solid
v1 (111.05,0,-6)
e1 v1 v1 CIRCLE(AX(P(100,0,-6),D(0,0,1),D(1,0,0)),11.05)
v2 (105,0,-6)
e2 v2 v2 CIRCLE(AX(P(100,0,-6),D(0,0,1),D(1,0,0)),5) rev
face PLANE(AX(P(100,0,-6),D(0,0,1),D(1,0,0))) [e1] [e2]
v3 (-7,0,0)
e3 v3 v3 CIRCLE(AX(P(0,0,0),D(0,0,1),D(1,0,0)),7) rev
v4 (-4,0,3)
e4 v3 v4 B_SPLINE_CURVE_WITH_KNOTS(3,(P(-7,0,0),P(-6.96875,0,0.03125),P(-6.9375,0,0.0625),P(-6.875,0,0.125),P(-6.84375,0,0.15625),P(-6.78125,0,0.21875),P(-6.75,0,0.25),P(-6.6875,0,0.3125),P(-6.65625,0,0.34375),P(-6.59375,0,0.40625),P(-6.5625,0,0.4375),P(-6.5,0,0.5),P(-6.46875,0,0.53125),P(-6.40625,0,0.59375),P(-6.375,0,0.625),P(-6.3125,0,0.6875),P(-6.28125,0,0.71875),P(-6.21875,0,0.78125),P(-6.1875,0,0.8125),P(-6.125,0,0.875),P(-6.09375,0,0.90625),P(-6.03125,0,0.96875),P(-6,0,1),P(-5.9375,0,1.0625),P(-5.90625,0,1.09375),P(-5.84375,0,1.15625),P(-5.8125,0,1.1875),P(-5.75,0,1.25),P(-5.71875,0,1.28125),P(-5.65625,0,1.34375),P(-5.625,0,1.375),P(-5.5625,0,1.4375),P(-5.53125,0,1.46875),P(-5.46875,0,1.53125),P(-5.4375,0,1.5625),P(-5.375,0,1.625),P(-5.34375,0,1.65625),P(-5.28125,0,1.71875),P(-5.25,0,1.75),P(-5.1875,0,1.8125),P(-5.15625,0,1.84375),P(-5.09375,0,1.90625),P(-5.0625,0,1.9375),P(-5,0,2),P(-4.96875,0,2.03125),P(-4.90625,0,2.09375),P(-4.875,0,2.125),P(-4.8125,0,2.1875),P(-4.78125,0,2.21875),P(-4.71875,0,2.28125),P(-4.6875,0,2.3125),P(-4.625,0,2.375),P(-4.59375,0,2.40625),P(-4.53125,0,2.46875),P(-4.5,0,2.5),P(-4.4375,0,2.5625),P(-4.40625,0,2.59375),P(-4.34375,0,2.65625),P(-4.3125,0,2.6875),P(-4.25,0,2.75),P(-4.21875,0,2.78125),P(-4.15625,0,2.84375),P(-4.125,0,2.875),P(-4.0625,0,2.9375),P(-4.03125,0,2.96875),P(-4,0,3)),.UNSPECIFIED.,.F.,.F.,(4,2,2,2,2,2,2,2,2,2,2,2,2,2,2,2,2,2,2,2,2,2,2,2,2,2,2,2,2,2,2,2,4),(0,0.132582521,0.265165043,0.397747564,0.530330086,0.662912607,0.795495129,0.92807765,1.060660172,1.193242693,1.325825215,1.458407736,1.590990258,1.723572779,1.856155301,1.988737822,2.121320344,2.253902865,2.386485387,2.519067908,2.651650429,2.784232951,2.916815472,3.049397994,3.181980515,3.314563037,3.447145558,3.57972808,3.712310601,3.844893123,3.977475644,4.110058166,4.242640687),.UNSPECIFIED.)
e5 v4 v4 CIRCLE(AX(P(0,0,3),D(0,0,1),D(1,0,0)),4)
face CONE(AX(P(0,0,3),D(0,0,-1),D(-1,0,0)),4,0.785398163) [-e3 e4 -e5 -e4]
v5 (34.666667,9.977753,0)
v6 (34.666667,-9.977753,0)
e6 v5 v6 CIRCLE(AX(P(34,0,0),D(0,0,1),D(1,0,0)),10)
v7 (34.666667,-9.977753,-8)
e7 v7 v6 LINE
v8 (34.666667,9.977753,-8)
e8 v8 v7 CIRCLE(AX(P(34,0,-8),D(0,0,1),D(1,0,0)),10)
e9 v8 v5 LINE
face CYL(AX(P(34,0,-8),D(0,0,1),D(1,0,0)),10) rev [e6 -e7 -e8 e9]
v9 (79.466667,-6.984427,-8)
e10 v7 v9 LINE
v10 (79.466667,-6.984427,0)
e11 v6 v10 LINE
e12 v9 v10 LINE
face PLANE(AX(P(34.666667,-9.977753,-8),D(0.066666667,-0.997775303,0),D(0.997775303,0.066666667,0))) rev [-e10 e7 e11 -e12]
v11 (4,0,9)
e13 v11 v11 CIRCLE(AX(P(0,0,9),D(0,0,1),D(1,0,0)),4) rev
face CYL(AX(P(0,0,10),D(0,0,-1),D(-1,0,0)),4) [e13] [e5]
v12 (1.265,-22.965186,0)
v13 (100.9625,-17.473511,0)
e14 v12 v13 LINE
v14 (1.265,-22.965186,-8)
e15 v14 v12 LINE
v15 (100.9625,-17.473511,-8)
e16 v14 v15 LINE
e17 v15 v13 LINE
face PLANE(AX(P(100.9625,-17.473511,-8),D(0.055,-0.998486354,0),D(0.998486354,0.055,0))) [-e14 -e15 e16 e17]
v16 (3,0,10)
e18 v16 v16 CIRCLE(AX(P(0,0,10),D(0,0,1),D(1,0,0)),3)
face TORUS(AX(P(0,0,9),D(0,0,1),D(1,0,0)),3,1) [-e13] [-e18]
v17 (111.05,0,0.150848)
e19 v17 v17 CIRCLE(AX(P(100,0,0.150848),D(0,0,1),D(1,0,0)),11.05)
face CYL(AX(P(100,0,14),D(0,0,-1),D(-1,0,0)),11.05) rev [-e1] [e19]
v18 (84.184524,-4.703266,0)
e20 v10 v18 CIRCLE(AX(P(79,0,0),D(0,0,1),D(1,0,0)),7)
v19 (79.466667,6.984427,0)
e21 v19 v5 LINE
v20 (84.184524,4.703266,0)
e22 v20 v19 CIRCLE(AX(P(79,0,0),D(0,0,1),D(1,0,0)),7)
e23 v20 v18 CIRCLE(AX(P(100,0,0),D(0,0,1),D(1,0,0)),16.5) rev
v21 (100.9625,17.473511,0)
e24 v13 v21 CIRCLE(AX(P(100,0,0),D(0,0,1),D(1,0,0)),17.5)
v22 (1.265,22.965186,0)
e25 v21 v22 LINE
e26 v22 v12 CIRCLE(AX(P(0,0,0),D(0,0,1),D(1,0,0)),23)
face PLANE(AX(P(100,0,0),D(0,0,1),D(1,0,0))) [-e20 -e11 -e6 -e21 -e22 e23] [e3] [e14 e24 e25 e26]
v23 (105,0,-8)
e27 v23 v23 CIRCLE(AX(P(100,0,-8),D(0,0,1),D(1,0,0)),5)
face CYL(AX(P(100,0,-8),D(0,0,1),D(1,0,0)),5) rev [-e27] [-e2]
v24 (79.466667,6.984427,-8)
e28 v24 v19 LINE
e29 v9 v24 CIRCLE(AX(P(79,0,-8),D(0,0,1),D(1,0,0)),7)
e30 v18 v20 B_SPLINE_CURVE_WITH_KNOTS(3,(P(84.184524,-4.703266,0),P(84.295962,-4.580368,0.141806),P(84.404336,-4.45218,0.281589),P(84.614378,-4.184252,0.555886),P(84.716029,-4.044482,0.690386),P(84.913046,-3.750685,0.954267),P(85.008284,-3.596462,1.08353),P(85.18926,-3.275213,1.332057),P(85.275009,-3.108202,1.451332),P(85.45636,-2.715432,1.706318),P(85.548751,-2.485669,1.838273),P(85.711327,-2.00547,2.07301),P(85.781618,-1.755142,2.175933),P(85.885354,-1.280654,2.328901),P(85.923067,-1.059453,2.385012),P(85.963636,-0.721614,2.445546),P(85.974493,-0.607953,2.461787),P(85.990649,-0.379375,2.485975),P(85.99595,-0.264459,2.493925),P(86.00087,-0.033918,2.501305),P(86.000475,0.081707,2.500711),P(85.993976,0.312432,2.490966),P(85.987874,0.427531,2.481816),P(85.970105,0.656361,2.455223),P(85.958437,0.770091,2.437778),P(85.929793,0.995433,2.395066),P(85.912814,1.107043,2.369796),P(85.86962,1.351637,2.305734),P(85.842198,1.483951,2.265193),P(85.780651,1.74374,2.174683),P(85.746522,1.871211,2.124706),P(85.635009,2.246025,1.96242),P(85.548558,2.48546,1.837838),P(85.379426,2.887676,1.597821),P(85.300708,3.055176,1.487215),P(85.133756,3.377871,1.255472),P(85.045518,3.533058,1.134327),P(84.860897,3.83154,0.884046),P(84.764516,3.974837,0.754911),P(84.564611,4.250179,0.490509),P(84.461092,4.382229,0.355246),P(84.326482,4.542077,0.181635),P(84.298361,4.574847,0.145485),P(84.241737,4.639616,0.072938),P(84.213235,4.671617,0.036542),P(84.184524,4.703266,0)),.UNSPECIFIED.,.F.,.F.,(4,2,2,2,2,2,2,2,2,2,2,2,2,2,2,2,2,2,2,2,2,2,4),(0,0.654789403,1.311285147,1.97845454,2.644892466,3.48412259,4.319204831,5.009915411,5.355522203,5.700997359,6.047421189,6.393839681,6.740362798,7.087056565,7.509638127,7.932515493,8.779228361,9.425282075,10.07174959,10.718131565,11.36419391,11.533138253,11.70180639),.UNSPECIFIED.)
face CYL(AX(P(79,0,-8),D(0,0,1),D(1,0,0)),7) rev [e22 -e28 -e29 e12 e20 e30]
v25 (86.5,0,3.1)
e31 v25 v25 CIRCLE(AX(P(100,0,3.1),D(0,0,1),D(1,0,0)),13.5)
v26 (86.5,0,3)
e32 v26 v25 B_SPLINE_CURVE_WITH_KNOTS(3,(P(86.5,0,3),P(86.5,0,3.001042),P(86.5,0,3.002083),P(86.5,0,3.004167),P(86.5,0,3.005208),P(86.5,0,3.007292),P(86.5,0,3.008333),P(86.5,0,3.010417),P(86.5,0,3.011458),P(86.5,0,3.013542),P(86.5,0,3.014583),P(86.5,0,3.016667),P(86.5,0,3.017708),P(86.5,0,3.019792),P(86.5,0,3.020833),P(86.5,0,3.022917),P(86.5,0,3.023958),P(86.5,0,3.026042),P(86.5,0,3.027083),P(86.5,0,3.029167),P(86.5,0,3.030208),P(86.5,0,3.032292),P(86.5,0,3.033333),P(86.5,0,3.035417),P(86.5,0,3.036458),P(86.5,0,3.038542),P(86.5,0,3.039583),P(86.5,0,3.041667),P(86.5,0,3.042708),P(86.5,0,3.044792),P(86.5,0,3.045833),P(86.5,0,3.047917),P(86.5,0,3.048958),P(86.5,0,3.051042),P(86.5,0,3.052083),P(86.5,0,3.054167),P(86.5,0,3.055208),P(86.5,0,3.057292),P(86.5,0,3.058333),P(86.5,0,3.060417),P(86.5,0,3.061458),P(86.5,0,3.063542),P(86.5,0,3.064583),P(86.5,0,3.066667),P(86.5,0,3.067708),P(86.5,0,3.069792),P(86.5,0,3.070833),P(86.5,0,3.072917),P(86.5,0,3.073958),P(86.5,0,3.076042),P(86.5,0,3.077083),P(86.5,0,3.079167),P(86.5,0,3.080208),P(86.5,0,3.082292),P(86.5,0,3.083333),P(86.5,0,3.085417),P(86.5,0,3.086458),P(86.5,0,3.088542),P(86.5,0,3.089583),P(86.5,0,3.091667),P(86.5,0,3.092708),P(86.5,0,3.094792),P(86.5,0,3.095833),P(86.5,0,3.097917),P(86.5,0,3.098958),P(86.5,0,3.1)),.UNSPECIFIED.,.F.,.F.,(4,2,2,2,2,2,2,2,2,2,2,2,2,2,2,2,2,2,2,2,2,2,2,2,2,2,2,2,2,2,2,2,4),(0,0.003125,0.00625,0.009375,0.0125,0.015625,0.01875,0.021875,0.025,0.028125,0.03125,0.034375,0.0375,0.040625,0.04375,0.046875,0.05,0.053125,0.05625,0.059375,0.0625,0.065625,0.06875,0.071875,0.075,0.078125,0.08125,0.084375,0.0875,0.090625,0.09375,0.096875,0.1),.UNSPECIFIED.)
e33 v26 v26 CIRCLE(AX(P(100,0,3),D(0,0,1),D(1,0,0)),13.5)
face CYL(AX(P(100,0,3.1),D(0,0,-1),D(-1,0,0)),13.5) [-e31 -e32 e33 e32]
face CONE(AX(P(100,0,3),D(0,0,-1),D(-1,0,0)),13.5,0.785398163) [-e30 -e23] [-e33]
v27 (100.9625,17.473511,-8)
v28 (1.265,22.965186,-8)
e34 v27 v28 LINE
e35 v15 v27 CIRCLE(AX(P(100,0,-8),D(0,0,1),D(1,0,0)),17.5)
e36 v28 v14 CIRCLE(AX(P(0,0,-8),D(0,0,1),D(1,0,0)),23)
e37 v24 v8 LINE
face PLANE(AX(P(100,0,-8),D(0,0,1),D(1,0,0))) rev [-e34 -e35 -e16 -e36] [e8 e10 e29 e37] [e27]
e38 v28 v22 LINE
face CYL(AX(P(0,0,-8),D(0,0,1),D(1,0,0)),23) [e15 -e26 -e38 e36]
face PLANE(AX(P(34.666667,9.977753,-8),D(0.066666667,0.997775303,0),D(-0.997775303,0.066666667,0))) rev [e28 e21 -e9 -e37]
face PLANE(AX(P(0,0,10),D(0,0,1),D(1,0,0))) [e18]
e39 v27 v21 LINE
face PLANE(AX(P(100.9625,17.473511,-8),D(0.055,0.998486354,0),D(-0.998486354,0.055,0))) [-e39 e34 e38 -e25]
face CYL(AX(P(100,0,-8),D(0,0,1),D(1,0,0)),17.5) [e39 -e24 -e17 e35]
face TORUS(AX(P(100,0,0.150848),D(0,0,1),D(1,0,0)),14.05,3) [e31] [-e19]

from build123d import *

# Parameters (mm, degrees)
SKETCH5_R           = 4
BOSS_EXTRUDE1_DEPTH = 10
SKETCH13_R          = 5.0000000000000036
BOSS_EXTRUDE5_DEPTH = 8
CHAMFER1_SIZE       = 3
FILLET1_R           = 1
SKETCH14_R          = 13.499999999999998
BOSS_EXTRUDE6_DEPTH = 3.1
CUT_EXTRUDE1_START  = -6
SKETCH15_R          = 11.050000000000002
CUT_EXTRUDE1_DEPTH  = 20
FILLET2_R           = 3
CHAMFER2_SIZE       = 3


with BuildPart() as part:
    # Sketch5 → Boss-Extrude1 (new body)
    with BuildSketch(Plane(origin=(0, 0, 0), x_dir=(0, 1, 0), z_dir=(0, 0, 1))):
        with Locations(Location((0, 0, 0), (0, 0, 270))):
            Circle(SKETCH5_R)
    extrude(amount=BOSS_EXTRUDE1_DEPTH)

    # Sketch13 → Boss-Extrude5 (add)
    with BuildSketch(Plane(origin=(0, 0, 0), x_dir=(0, 1, 0), z_dir=(0, 0, 1))):
        with BuildLine():
            Line((-17.473511202674743, -100.9625), (-22.96518615208682, -1.2650000000000037))
            ThreePointArc((-22.96518615208682, -1.2650000000000037), (1.41e-15, 23.000000000000004), (22.96518615208682, -1.2649999999999981))
            Line((22.96518615208682, -1.2649999999999981), (17.47351120267477, -100.9625))
            ThreePointArc((17.47351120267477, -100.9625), (1.332e-14, -117.5), (-17.473511202674743, -100.9625))
        make_face()
        with Locations(Location((1.225e-14, -100, 0), (0, 0, 270))):
            Circle(SKETCH13_R, mode=Mode.SUBTRACT)
        with BuildLine():
            Line((-9.977753031397176, -34.66666666666667), (-6.984427121978019, -79.46666666666665))
            ThreePointArc((-6.984427121978019, -79.46666666666665), (8.55e-15, -86), (6.9844271219780385, -79.46666666666665))
            Line((6.9844271219780385, -79.46666666666665), (9.977753031397182, -34.66666666666667))
            ThreePointArc((9.977753031397182, -34.66666666666667), (4.78e-15, -24), (-9.977753031397176, -34.66666666666667))
        make_face(mode=Mode.SUBTRACT)
    extrude(amount=-BOSS_EXTRUDE5_DEPTH)

    # Chamfer1
    chamfer1_edges = [part.edges().sort_by_distance(p)[0] for p in [
        (-4, 1.22e-15, 0),
    ]]
    chamfer(chamfer1_edges, length=CHAMFER1_SIZE)

    # Fillet1
    fillet1_edges = [part.edges().sort_by_distance(p)[0] for p in [
        (-4, 1.22e-15, 10),
    ]]
    fillet(fillet1_edges, radius=FILLET1_R)

    # Sketch14 → Boss-Extrude6 (add)
    with BuildSketch(Plane(origin=(0, 0, 0), x_dir=(0, 1, 0), z_dir=(0, 0, 1))):
        with Locations(Location((1.225e-14, -100, 0), (0, 0, 90))):
            Circle(SKETCH14_R)
    extrude(amount=BOSS_EXTRUDE6_DEPTH)

    # Sketch15 → Cut-Extrude1 (cut)
    with BuildSketch(Plane(origin=(0, 0, 0), x_dir=(0, 1, 0), z_dir=(0, 0, 1)).offset(CUT_EXTRUDE1_START)):
        with Locations(Location((1.225e-14, -100, 0), (0, 0, 270))):
            Circle(SKETCH15_R)
    extrude(amount=CUT_EXTRUDE1_DEPTH, mode=Mode.SUBTRACT)

    # Fillet2
    # the kernel refuses this fillet: 3 mm, written as the material it takes off along each edge
    with BuildSketch(Plane(origin=(100, 1.225e-14, 3.0999999999999996), x_dir=(1, -1.8e-16, 0), z_dir=(1.8e-16, 1, 0))) as fillet2_piece_1:
        with BuildLine():
            CenterArc((14.049999999999997, 2.949152420612873), FILLET2_R, 180, 79.43602241094561)
            Line((11.049999999999997, 2.949152420612873), (10.989999999999995, 2.949152420612873))
            Line((10.989999999999995, 2.949152420612873), (10.989999999999995, 0))
            Line((10.989999999999995, 0), (11.049999999999997, -0.06000000000000005))
            ThreePointArc((11.049999999999997, -0.06000000000000005), (12.275000000000105, -0.0600000000000005), (13.489000000000217, -0.05898304841112623))
            Line((13.489000000000217, -0.05898304841112623), (13.500000000000213, 1.10889e-12))
        make_face()
    revolve(axis=Axis((100, 1.225e-14, 3.0999999999999996), (0, 0, -1)), mode=Mode.SUBTRACT)

    # Chamfer2
    # the kernel refuses this chamfer: 3 mm, written as the material it adds along each edge
    with BuildSketch(Plane(origin=(100, 1.225e-14, 0), x_dir=(-1, 6e-17, 0), z_dir=(6e-17, 1, 0))) as chamfer2_piece_1_section:
        Polygon((13.5 + CHAMFER2_SIZE, 0), (13.5, CHAMFER2_SIZE), (13.5, 0), align=None)
    chamfer2_piece_1 = revolve(axis=Axis((100, 1.225e-14, 0), (0, 0, 1)), mode=Mode.PRIVATE)
    chamfer2_piece_1 = chamfer2_piece_1 - Plane(origin=(78.99999999999999, 9.77e-15, 1.4464911380903063), x_dir=(0.0666666666666669, -0.9977753031397177, 0), z_dir=(0, 0, 1)) * Cylinder(7.000000000000007, 66, mode=Mode.PRIVATE)
    add(chamfer2_piece_1)


solid = part.part
